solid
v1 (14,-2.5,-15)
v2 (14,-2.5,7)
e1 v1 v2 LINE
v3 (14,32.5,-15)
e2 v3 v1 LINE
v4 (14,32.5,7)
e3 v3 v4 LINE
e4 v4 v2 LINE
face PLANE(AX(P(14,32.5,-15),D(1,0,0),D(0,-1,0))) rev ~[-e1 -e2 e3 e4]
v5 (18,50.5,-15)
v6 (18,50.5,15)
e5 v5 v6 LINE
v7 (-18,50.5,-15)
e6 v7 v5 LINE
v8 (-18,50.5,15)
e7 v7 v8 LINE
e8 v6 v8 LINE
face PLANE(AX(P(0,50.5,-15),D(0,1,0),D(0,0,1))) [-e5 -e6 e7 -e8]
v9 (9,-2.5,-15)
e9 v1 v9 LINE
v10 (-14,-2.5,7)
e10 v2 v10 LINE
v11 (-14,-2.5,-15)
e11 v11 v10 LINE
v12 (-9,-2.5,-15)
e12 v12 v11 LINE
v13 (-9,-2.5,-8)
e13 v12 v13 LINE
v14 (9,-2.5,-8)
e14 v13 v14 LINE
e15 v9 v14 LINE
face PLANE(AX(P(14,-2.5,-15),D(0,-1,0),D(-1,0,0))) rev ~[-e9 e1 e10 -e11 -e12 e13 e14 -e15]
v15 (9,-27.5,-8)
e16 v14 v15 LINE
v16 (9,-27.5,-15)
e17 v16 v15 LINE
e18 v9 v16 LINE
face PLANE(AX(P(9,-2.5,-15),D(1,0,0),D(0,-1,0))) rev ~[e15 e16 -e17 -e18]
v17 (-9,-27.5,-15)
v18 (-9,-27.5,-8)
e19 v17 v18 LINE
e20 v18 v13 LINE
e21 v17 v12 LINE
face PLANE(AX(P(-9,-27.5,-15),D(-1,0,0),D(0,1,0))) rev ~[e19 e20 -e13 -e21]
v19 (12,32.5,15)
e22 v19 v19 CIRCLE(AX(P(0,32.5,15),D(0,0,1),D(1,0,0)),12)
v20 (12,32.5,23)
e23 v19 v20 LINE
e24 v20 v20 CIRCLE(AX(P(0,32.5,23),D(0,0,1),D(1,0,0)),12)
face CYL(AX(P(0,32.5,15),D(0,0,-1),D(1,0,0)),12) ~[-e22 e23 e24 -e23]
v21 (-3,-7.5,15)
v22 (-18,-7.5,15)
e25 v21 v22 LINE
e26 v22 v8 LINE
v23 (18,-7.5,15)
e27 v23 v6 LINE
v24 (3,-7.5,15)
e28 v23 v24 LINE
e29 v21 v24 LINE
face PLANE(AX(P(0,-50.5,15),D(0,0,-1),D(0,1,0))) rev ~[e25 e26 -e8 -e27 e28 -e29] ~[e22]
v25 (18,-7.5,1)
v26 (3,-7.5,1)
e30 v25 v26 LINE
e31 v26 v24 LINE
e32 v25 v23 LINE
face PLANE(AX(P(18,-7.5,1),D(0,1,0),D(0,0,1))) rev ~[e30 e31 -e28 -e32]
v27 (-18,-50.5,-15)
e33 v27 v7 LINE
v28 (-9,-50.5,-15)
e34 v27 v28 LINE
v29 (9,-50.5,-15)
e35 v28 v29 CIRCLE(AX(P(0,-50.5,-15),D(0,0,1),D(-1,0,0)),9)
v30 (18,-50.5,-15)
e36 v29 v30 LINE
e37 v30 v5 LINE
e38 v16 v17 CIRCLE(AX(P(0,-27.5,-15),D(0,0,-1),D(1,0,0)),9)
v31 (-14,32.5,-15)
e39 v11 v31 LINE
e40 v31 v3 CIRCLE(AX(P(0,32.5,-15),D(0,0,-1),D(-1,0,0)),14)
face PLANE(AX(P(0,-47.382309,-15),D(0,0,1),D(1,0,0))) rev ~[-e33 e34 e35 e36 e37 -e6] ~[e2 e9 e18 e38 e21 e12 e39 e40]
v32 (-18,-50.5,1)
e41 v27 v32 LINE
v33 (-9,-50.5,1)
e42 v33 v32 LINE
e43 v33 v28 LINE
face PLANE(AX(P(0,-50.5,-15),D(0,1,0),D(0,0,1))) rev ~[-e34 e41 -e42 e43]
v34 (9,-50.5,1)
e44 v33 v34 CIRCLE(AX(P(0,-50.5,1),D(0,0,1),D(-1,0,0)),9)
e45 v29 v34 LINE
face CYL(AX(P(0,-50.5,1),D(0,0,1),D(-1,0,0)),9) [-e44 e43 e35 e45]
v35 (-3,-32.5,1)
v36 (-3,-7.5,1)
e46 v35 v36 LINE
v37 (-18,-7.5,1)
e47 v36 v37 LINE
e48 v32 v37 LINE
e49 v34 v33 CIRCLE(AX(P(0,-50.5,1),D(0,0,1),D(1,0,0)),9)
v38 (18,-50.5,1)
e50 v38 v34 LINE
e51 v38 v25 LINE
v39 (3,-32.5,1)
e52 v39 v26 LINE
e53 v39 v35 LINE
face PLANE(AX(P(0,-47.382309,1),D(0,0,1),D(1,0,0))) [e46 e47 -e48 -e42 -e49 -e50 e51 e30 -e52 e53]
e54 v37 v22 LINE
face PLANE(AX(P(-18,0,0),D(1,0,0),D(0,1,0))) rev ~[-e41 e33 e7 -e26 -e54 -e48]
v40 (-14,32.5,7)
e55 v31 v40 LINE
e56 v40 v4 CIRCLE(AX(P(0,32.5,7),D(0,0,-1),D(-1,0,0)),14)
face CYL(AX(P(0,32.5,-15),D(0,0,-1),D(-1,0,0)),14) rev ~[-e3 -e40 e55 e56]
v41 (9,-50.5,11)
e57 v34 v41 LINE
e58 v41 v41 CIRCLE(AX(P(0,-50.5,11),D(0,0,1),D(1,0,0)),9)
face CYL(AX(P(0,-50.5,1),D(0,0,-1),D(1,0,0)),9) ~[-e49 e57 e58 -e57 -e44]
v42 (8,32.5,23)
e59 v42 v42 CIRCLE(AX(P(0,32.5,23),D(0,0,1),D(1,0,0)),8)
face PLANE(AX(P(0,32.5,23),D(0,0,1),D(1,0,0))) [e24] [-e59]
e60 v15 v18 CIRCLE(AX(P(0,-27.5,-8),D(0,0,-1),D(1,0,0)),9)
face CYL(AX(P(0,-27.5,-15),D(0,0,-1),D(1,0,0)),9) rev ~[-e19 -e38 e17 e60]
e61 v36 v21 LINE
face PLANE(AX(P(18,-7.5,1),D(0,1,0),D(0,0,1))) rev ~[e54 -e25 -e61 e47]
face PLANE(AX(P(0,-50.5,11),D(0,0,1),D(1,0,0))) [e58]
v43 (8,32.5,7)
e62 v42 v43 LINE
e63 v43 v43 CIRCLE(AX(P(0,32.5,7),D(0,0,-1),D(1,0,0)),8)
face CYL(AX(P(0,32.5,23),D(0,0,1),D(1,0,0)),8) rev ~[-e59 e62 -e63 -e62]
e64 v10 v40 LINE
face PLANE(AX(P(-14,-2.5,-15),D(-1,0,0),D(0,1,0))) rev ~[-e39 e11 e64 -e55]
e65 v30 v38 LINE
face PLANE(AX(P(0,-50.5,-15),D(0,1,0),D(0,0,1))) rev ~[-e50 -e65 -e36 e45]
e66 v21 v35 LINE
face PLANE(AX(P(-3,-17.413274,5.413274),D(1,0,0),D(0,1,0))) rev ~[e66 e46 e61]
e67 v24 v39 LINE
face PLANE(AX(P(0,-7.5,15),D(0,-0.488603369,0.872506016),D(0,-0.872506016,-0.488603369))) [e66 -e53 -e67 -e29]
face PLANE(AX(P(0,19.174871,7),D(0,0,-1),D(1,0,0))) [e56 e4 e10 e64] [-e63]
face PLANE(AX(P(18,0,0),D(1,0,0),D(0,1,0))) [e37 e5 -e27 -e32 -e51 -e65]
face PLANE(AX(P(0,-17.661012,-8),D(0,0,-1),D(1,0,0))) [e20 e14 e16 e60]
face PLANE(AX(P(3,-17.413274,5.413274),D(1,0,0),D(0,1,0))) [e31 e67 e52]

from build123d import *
from build123d import SkipClean  # not in build123d's __all__

# Parameters (mm, degrees)
F0_W      = 101
F0_H      = 30
F1_DEPTH  = 18
F2_R      = 12
F3_DEPTH  = 8
F4_R      = 8
F5_DEPTH  = 38.001
F6_W      = 43
F6_H      = 14
F7_DEPTH  = 36.001
F9_DEPTH  = 16
F8_R      = 9
F10_DEPTH = 10
F12_DEPTH = 3
F13_R     = 8
F14_DEPTH = 22
F16_DEPTH = 7


# Not quite as in the source:
# - after a boolean that leaves OpenCascade's solid faulty, fix() repairs it


with BuildPart() as f1:
    # F0 (on Right) → F1 (new body, symmetric)
    with BuildSketch(Plane.YZ):
        Rectangle(F0_W, F0_H)
    extrude(amount=F1_DEPTH, both=True)

    # F2 (on face) → F3 (join)
    with BuildSketch(Plane.XY.offset(15)):
        with Locations((0, 32.5)):
            Circle(F2_R)
    extrude(amount=F3_DEPTH)

    # F4 (on face) → F5 (cut, through all)
    with BuildSketch(Plane.XY.offset(23)):
        with Locations((0, 32.5)):
            Circle(F4_R)
    extrude(amount=-F5_DEPTH, mode=Mode.SUBTRACT)

    # F6 (on face) → F7 (cut, through all)
    with BuildSketch(Plane.YZ.offset(18)):
        with Locations((-29, 8)):
            Rectangle(F6_W, F6_H)
    extrude(amount=-F7_DEPTH, mode=Mode.SUBTRACT)

    # F8 (on face) → F9 (join)
    with BuildSketch(Plane.XY.offset(1)):
        with BuildLine():
            Line((-9, -50.5), (9, -50.5))
            ThreePointArc((9, -50.5), (0, -41.5), (-9, -50.5))
        make_face()
        with BuildLine():
            ThreePointArc((-9, -50.5), (0, -59.5), (9, -50.5))
            Line((9, -50.5), (-9, -50.5))
        make_face()
    extrude(amount=-F9_DEPTH)

    # F8 (on face) → F10 (join)
    with BuildSketch(Plane.XY.offset(1)):
        with Locations((0, -50.5)):
            Circle(F8_R)
    with SkipClean():  # cleaning this boolean's faces spoils the solid; the shape is the same uncleaned
        extrude(amount=F10_DEPTH)

    # F11 (on Right) → F12 (join, symmetric)
    with BuildSketch(Plane.YZ):
        Polygon((-7.5, 1), (-7.5, 15), (-32.5, 1), align=None)
    extrude(amount=F12_DEPTH, both=True)

    add(f1.part.fix(), mode=Mode.REPLACE)

    # F13 (on face) → F14 (cut)
    with BuildSketch(Plane(origin=(0, 0, -15), x_dir=(1, 0, 0), z_dir=(0, 0, -1))):
        with BuildLine():
            Line((-14, 2.5), (-14, -32.5))
            ThreePointArc((-14, -32.5), (0, -46.5), (14, -32.5))
            Line((14, -32.5), (14, 2.5))
            Line((14, 2.5), (-14, 2.5))
        make_face()
        with Locations((0, -32.5)):
            Circle(F13_R, mode=Mode.SUBTRACT)
    extrude(amount=-F14_DEPTH, mode=Mode.SUBTRACT)

    # F15 (on face) → F16 (cut)
    with BuildSketch(Plane(origin=(0, 0, -15), x_dir=(1, 0, 0), z_dir=(0, 0, -1))):
        with BuildLine():
            Line((9, 2.5), (9, 27.5))
            ThreePointArc((9, 27.5), (0, 36.5), (-9, 27.5))
            Line((-9, 27.5), (-9, 2.5))
            Line((-9, 2.5), (9, 2.5))
        make_face()
    extrude(amount=-F16_DEPTH, mode=Mode.SUBTRACT)


solid = f1.part
